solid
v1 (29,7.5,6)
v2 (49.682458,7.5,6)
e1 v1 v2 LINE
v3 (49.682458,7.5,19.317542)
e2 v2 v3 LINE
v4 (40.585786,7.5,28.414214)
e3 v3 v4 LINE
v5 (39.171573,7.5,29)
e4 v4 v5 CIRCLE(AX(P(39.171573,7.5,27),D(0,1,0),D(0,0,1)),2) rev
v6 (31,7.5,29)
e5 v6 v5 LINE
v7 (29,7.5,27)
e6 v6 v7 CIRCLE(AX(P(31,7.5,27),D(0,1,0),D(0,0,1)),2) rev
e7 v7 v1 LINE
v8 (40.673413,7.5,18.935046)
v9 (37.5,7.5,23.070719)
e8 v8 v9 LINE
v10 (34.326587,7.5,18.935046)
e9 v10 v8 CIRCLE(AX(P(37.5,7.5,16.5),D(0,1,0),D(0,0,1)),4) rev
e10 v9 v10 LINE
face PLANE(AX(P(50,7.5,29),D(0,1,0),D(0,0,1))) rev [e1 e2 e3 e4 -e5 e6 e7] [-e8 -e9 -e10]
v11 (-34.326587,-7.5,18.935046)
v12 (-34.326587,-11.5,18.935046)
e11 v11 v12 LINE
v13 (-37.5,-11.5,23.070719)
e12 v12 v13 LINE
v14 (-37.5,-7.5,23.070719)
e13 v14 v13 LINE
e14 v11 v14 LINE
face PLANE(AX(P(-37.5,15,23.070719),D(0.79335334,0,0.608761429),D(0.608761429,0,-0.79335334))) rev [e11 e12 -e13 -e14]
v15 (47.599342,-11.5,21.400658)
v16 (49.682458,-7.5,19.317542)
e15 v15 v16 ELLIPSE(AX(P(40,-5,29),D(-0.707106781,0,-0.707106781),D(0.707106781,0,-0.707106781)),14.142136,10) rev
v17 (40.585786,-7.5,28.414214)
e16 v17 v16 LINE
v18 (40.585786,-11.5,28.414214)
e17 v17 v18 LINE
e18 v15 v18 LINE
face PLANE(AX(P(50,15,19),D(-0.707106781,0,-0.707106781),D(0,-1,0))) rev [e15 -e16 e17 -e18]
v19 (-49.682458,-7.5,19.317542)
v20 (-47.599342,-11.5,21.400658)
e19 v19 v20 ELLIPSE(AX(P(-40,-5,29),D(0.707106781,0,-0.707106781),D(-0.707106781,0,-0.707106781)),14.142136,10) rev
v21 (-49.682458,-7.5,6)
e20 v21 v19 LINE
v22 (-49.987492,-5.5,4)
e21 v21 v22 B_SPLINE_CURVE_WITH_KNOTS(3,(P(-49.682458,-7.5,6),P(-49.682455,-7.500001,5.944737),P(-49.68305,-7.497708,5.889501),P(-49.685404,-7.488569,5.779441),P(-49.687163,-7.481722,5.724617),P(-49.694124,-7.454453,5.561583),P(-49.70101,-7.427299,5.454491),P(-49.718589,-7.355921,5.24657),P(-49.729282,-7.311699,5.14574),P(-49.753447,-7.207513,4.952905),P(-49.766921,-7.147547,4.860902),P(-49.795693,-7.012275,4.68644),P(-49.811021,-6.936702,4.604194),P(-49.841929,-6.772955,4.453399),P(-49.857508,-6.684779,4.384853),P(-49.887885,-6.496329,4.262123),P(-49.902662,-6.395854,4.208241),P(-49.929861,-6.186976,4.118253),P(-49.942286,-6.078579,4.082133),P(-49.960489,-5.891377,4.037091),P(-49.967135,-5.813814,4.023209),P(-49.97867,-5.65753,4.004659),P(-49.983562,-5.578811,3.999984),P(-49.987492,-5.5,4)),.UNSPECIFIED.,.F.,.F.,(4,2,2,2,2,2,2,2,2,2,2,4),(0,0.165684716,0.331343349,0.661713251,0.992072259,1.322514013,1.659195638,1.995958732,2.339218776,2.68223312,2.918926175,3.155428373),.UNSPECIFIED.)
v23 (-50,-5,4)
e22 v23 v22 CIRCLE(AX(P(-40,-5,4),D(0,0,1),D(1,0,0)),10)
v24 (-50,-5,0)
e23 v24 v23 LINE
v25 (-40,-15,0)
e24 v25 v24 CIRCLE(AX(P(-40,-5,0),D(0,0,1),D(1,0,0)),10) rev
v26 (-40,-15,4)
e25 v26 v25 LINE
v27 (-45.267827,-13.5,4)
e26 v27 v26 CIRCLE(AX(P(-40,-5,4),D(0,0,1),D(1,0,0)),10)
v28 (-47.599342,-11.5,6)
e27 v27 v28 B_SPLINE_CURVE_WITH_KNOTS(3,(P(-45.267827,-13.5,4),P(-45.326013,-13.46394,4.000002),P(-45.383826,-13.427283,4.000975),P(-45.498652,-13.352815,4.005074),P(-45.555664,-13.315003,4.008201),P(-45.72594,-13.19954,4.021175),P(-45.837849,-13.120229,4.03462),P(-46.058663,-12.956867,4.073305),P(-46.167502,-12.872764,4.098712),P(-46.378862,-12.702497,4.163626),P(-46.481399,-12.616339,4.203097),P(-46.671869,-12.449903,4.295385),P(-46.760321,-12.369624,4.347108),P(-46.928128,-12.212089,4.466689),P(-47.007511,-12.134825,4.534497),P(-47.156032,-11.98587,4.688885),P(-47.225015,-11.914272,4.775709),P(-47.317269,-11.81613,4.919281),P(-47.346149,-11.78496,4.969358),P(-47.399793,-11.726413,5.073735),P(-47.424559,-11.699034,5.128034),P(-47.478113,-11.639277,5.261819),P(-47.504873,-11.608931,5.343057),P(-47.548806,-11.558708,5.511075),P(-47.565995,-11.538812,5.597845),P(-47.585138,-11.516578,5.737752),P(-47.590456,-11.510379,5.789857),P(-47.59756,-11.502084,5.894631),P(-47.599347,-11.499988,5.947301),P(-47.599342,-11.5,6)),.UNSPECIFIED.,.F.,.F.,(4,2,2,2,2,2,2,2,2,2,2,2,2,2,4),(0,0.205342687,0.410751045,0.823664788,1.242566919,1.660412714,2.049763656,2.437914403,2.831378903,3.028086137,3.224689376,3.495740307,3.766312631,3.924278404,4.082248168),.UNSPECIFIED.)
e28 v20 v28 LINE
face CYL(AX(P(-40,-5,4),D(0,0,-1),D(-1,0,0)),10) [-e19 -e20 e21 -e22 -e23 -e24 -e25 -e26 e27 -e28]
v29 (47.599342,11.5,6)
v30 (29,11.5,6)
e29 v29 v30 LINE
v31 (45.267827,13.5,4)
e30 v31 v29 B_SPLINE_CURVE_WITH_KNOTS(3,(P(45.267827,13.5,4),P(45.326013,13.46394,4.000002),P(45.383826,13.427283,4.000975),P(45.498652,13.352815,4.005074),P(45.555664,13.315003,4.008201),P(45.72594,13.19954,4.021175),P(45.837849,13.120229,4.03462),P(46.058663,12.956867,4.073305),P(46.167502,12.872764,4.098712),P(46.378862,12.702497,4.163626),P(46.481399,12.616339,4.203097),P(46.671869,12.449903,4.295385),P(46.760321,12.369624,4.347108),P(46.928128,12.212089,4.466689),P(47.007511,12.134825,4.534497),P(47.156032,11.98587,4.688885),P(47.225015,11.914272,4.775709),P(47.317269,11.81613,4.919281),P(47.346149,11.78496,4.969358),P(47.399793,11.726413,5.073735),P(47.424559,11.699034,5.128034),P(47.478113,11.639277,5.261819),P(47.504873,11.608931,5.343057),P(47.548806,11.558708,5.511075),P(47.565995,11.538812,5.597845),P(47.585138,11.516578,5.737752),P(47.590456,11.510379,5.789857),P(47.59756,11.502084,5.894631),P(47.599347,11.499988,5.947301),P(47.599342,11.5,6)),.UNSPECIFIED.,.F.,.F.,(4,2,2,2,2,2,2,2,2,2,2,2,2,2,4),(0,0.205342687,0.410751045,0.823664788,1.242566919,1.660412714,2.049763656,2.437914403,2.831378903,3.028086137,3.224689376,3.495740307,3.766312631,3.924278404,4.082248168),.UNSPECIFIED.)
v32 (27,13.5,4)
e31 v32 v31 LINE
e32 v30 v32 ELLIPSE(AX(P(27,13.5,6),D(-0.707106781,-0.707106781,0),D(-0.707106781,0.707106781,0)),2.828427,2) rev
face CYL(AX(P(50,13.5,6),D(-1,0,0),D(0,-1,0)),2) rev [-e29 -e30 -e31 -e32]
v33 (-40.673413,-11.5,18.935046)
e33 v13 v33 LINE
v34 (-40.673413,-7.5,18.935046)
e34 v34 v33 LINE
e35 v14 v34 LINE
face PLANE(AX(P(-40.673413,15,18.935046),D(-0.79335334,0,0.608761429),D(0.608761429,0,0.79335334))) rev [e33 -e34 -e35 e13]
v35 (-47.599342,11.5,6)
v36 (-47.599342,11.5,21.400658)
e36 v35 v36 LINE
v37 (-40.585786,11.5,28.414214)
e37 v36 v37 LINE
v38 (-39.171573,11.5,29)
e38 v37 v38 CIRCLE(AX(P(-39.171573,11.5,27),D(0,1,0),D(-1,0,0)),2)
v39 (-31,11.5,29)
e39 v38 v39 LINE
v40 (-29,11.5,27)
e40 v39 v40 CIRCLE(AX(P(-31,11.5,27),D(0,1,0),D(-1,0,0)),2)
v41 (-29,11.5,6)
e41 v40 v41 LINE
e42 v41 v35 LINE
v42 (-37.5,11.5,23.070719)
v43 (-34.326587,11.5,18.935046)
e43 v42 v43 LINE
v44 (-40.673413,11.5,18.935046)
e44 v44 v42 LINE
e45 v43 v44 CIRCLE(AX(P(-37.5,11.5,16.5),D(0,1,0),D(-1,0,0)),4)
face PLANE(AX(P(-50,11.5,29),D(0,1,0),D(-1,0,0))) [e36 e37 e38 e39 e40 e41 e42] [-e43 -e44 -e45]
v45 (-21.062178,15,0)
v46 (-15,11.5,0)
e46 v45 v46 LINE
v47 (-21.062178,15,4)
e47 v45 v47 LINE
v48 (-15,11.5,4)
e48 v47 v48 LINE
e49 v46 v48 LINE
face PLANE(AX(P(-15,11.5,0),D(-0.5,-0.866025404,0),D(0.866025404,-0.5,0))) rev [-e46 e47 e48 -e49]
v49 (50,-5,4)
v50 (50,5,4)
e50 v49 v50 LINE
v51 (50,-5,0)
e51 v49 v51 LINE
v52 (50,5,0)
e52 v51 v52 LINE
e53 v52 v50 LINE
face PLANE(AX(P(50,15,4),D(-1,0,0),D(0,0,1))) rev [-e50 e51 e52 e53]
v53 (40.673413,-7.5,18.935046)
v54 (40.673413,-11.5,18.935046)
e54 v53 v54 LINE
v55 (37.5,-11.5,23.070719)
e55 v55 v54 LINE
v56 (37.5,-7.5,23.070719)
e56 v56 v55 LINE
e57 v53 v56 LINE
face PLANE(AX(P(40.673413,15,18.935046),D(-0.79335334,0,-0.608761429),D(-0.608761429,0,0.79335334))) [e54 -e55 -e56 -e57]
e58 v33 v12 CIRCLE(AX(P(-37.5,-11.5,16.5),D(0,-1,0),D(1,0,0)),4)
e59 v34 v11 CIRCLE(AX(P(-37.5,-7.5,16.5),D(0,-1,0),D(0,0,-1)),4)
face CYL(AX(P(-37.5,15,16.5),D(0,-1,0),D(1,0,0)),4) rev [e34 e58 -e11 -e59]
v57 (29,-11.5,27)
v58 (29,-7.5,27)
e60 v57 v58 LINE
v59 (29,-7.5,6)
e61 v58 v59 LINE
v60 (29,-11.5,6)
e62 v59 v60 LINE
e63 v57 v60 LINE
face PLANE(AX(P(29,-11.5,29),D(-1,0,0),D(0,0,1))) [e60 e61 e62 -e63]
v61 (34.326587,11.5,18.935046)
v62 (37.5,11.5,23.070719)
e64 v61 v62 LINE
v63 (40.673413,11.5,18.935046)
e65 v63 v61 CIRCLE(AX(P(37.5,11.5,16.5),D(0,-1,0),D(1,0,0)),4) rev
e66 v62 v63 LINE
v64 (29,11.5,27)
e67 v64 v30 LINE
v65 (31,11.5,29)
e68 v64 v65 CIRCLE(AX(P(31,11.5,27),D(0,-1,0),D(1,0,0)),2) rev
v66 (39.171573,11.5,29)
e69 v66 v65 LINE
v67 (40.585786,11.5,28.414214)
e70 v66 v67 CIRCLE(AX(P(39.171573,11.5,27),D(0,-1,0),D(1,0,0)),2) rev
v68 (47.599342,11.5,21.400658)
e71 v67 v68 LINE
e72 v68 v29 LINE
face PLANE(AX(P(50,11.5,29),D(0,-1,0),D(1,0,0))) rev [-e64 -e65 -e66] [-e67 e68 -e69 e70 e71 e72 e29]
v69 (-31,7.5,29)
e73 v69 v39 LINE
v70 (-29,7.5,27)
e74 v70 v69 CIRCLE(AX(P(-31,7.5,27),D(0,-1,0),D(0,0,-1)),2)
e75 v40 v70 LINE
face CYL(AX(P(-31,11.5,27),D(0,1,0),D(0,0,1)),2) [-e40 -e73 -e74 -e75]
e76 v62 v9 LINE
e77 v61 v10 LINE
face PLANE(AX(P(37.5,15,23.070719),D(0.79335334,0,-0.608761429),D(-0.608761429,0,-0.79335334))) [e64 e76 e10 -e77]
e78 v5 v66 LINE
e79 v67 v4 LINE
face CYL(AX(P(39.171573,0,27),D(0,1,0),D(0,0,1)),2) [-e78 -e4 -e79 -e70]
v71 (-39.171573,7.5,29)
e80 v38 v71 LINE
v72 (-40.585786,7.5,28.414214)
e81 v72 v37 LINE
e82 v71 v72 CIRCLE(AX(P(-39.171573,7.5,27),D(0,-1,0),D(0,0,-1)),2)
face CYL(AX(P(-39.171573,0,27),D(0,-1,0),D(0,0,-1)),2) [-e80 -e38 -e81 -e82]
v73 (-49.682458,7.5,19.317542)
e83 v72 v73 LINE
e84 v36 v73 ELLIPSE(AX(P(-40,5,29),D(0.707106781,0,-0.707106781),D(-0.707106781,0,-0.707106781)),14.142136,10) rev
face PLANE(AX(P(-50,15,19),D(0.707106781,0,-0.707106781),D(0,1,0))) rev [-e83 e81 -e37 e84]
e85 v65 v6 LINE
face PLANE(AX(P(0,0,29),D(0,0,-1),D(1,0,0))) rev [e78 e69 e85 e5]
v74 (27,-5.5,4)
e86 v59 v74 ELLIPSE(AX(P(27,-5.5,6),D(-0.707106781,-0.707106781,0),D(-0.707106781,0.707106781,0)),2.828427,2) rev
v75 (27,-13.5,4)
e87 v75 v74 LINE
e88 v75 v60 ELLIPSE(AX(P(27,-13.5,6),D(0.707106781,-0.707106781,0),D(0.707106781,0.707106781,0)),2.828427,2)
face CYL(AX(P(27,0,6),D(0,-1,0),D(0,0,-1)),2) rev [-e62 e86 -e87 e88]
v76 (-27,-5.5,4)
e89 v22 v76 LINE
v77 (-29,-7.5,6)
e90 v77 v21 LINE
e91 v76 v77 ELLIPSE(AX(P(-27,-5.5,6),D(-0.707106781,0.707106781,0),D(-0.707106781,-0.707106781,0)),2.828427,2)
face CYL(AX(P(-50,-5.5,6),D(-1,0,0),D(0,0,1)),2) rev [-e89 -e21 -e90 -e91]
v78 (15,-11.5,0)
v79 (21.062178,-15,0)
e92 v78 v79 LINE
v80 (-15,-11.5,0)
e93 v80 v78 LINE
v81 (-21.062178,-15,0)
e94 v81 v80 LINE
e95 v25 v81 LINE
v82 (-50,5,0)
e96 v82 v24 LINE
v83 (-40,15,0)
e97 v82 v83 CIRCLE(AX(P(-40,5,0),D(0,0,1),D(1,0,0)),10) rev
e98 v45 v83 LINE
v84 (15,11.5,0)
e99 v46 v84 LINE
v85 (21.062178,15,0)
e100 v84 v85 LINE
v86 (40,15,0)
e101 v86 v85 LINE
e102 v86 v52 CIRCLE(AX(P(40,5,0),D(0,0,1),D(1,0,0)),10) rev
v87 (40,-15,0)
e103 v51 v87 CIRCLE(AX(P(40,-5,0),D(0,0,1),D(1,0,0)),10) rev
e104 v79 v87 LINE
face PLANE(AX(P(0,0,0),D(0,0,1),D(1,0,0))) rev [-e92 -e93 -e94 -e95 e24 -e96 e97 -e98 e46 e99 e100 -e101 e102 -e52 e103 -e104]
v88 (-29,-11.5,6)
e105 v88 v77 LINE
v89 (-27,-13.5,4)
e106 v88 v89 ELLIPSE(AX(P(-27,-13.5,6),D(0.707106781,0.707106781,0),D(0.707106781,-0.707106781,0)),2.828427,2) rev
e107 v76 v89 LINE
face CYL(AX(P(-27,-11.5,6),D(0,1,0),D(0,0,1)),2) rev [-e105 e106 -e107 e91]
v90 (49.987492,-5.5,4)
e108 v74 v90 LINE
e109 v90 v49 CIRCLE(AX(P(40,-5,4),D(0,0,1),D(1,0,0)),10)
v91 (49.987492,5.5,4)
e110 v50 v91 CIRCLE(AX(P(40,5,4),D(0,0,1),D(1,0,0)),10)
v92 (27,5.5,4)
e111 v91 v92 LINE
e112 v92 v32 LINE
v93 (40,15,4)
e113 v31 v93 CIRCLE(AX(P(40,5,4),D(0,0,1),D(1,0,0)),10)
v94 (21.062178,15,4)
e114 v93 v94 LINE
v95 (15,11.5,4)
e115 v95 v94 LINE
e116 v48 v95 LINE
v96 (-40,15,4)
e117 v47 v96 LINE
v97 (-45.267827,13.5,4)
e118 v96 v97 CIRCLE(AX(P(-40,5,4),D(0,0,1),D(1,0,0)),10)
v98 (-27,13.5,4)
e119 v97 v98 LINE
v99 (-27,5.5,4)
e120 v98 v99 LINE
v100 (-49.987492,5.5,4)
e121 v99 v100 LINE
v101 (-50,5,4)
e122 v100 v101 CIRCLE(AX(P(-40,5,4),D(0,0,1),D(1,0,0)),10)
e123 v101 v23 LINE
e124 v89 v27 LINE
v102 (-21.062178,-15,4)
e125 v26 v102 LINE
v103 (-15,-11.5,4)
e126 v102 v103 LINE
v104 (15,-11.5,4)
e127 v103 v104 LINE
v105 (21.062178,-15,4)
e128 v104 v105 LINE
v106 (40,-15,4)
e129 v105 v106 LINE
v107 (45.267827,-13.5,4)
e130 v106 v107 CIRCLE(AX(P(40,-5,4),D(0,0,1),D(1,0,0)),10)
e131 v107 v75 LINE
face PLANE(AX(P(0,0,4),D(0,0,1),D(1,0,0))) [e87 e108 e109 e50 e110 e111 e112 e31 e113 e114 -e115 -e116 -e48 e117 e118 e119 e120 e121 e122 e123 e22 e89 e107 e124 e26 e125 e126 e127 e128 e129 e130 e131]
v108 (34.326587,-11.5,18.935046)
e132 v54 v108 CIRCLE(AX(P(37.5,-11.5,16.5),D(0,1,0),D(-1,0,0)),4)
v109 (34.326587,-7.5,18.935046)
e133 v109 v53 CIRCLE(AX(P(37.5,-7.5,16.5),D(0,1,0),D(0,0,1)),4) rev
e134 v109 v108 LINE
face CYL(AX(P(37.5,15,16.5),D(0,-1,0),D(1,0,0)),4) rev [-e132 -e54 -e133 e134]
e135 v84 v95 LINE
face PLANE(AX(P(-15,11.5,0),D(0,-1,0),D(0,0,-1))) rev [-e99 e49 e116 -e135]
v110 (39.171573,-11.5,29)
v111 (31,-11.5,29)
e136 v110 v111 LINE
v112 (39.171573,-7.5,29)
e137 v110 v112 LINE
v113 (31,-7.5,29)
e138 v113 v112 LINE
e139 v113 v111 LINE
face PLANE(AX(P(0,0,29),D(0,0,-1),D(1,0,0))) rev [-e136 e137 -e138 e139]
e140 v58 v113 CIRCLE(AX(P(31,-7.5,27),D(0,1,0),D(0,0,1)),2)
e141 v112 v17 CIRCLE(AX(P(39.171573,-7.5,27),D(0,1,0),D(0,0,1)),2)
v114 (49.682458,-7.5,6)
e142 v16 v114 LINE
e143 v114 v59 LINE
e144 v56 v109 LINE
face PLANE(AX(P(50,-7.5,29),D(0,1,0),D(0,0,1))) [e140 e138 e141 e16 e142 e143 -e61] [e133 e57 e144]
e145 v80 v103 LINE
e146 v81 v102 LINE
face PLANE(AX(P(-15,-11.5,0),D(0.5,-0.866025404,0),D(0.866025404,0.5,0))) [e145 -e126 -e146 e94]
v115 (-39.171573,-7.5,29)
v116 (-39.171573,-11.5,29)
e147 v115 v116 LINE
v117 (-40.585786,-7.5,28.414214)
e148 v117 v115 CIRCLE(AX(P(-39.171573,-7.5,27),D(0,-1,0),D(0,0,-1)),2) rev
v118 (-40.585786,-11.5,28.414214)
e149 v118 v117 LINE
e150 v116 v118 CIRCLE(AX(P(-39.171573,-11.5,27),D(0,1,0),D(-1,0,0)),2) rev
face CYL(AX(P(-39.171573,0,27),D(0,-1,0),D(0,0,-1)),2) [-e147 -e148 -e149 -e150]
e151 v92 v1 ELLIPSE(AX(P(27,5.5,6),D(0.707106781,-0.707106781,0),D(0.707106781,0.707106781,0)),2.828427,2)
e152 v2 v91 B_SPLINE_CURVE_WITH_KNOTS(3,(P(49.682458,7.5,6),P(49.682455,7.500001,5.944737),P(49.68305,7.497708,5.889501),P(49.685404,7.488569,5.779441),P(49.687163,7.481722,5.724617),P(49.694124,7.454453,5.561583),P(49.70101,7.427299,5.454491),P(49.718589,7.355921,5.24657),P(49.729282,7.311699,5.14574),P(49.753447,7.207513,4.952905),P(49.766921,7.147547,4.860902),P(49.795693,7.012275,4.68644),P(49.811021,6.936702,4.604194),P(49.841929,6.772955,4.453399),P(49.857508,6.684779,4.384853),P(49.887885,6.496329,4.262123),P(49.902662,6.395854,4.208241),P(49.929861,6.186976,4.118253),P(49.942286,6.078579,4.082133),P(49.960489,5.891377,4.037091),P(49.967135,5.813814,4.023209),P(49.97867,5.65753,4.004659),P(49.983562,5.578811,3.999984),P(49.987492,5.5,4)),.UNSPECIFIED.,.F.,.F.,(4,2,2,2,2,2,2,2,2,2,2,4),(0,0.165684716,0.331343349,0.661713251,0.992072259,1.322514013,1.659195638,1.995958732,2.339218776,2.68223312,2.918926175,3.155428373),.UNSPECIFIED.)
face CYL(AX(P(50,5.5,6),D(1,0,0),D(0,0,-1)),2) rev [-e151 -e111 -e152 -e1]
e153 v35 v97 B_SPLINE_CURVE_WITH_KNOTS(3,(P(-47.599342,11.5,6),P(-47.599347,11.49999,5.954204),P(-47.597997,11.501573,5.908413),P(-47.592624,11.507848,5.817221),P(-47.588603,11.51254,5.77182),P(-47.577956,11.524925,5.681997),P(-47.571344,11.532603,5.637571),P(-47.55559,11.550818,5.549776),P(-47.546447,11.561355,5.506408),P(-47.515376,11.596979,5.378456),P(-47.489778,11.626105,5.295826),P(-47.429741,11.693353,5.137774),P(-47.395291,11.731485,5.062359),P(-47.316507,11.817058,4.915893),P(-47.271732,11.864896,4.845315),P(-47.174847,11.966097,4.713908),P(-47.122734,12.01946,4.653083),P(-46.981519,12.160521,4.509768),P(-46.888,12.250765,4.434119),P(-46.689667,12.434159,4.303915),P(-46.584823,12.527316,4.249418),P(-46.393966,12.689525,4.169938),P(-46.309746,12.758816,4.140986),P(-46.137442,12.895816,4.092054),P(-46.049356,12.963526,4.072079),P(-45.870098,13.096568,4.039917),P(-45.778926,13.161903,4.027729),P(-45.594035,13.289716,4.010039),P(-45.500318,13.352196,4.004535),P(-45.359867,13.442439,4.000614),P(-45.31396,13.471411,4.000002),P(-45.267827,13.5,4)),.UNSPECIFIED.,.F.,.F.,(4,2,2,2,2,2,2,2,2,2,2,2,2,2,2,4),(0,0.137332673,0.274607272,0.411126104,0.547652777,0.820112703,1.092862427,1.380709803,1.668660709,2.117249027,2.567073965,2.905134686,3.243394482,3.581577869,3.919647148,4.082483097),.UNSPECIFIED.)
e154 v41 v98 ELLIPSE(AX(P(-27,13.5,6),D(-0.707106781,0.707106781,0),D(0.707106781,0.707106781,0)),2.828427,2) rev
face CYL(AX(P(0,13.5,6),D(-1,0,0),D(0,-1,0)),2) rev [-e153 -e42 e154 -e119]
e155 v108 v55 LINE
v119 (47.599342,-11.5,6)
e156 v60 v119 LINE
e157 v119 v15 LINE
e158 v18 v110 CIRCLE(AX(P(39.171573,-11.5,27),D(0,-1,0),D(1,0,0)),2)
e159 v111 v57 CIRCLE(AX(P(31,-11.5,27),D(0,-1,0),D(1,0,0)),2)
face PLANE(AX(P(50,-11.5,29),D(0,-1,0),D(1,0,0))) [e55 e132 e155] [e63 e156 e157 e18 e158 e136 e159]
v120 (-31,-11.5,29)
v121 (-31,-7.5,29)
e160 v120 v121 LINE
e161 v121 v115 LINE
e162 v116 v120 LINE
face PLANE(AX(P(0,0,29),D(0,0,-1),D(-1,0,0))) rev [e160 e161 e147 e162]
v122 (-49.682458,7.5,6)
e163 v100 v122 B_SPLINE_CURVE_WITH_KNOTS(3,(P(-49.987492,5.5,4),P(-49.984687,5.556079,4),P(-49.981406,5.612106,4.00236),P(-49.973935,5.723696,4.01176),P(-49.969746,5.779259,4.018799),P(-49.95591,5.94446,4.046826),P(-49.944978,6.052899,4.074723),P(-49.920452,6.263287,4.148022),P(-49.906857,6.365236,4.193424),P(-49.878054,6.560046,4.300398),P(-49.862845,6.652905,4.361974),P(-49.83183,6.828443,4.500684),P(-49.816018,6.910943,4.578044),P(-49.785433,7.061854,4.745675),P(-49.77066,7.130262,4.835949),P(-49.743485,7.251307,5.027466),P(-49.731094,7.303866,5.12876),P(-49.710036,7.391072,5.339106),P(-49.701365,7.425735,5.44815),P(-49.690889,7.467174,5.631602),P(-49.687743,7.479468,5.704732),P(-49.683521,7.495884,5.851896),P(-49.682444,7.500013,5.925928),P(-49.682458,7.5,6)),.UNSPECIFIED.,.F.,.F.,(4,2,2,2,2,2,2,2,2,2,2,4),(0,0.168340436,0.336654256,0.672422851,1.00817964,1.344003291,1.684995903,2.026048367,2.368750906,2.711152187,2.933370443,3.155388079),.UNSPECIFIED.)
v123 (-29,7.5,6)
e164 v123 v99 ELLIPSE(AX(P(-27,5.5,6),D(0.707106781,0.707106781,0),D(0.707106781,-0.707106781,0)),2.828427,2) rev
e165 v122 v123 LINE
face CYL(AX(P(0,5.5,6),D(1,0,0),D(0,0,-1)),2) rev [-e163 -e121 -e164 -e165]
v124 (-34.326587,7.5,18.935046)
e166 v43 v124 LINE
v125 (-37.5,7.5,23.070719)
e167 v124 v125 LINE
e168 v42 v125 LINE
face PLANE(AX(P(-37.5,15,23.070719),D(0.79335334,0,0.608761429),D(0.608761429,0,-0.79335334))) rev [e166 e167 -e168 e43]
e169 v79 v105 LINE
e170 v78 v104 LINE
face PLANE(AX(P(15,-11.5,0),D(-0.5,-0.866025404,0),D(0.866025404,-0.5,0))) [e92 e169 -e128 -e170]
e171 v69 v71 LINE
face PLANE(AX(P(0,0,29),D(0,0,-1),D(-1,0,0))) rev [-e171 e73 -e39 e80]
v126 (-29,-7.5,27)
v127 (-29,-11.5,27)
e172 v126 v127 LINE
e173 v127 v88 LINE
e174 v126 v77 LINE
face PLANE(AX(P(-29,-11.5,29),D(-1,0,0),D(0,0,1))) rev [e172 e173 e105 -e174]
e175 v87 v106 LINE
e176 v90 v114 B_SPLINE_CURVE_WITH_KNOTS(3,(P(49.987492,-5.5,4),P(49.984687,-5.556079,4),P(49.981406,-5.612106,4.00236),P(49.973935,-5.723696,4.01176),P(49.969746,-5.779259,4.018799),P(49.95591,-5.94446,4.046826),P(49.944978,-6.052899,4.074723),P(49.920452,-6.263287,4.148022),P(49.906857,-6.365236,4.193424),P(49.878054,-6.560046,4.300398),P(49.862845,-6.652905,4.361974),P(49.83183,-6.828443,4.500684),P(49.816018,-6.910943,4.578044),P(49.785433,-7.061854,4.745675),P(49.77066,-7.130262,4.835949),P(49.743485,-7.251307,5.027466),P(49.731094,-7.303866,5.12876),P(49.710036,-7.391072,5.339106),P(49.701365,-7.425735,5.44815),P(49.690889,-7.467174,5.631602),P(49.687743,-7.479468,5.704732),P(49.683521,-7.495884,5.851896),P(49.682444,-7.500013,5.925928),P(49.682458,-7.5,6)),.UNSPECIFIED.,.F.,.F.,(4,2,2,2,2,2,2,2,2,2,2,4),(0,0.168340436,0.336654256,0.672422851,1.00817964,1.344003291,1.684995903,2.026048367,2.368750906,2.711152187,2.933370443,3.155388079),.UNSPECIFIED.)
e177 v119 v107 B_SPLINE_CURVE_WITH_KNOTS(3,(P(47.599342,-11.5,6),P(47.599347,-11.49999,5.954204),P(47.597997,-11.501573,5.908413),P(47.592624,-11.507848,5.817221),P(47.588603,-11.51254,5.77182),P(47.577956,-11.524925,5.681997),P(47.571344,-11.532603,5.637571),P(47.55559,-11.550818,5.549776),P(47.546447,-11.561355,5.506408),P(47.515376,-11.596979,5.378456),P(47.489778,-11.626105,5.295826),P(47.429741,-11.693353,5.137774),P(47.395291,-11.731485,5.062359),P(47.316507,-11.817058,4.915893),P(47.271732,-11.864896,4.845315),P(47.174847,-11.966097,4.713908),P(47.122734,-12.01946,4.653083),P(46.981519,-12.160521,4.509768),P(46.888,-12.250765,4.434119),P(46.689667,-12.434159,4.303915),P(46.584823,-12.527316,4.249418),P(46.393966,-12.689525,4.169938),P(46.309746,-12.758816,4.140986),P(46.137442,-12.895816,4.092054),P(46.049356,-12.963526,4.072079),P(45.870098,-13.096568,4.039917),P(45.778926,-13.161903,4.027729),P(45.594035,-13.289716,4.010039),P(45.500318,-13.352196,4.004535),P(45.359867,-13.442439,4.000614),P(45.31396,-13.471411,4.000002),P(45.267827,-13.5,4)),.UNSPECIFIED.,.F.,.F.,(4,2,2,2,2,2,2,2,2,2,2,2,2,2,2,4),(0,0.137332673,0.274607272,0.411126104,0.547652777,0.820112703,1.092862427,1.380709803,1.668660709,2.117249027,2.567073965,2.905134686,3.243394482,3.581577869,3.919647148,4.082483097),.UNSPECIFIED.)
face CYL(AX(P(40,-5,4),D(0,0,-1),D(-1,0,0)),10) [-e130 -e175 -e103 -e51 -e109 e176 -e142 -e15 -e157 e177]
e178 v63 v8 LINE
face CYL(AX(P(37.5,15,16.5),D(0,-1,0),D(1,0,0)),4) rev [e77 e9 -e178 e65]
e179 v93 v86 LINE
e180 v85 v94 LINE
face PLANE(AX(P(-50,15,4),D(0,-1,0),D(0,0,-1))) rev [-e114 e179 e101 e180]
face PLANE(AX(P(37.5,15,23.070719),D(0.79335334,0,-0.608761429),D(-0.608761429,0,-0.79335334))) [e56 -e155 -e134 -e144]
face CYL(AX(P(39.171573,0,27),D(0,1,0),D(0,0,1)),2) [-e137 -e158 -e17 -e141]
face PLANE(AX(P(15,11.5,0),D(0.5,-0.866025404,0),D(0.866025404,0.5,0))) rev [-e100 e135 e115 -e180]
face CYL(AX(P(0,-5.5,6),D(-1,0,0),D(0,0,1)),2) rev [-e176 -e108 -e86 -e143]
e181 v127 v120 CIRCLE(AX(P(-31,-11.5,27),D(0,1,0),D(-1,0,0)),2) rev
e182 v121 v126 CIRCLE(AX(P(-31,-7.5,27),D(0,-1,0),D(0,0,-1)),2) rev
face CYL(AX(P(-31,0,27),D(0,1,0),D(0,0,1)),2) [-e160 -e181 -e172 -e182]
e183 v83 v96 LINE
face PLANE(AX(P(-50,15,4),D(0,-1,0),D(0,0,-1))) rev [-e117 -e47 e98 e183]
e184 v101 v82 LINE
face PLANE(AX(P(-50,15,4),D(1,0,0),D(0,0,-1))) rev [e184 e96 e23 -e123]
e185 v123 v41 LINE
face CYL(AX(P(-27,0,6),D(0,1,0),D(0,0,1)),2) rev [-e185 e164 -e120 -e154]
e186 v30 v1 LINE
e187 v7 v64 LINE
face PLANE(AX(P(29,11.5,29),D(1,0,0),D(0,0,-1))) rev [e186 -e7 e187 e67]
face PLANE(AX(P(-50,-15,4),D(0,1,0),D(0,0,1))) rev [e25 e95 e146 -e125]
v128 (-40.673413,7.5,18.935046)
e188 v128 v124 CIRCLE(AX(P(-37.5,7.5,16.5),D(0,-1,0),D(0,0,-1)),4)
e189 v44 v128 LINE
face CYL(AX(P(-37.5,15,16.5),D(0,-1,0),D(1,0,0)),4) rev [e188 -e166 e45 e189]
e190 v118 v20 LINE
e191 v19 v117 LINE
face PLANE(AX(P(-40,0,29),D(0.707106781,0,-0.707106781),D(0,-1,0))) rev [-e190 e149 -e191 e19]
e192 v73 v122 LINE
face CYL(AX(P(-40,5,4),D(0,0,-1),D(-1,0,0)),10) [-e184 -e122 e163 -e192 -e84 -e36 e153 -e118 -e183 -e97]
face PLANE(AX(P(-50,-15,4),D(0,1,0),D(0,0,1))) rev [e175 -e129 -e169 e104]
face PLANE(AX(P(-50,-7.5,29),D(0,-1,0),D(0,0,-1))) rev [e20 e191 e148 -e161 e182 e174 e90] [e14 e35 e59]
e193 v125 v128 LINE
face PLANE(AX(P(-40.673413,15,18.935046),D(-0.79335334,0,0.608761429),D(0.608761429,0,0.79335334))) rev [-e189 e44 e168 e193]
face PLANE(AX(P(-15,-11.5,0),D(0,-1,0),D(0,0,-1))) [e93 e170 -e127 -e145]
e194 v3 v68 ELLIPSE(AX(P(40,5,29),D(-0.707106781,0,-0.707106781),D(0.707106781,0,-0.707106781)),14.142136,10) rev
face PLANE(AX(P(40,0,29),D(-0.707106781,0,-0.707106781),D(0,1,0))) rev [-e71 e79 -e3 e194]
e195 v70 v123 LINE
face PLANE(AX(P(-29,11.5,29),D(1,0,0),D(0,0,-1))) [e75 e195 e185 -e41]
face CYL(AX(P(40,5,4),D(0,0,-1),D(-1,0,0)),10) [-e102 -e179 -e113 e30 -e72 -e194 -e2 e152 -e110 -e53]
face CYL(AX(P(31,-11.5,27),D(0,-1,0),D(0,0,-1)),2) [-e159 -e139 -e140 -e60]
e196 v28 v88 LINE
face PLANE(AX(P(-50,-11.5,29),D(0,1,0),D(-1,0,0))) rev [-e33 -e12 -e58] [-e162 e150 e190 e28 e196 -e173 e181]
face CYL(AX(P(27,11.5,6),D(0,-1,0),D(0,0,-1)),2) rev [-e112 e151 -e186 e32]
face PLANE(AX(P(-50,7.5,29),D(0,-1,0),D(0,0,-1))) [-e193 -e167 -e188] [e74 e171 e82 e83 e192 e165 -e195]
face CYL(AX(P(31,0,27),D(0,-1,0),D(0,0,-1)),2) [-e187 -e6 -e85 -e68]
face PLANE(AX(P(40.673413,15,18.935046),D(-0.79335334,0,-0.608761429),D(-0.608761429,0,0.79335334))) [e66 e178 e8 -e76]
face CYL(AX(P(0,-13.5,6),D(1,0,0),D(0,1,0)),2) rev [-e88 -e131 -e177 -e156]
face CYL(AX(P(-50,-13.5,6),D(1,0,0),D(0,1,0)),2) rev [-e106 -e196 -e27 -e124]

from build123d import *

# Parameters (mm, degrees)
SKETCH1_W                = 100
SKETCH1_H                = 30
BOSS_EXTRUDE1_DEPTH      = 4
SKETCH2_W                = 21
SKETCH2_H                = 4
BOSS_EXTRUDE2_DEPTH      = 25
CHAMFER1_SIZE            = 10
CHAMFER1_OF_MIRROR1_SIZE = 10
MIRROR2_START            = -11.5
MIRROR2_DEPTH            = 4
MIRROR2_START_2          = 7.5
MIRROR2_2_DEPTH          = 4
CUT_EXTRUDE1_DEPTH       = 64.586555183
FILLET1_R                = 10
FILLET2_R                = 2
CUT_EXTRUDE2_DEPTH       = 58.879184626


# Read off the part's stored shape, not the designer's step: Mirror2
with BuildPart() as part:
    # Sketch1 → Boss-Extrude1 (new body)
    with BuildSketch(Plane.XY):
        Rectangle(SKETCH1_W, SKETCH1_H)
    extrude(amount=BOSS_EXTRUDE1_DEPTH)

    # Sketch2 → Boss-Extrude2 (add)
    with BuildSketch(Plane.XY.offset(4)):
        with Locations((-39.5, -9.5)):
            Rectangle(SKETCH2_W, SKETCH2_H)
    boss_extrude2 = extrude(amount=BOSS_EXTRUDE2_DEPTH)

    # Chamfer1
    chamfer1_edges = [part.edges().sort_by_distance(p)[0] for p in [
        (-50, -9.5, 29),
    ]]
    chamfer(chamfer1_edges, length=CHAMFER1_SIZE)

    # Mirror1: Boss-Extrude2 across plane
    add(boss_extrude2.mirror(Plane.ZX))

    # Chamfer1 of Mirror1
    chamfer1_of_mirror1_edges = [part.edges().sort_by_distance(p)[0] for p in [
        (-50, 9.5, 29),
    ]]
    chamfer(chamfer1_of_mirror1_edges, length=CHAMFER1_OF_MIRROR1_SIZE)

    # Mirror2 outline → Mirror2 (add)
    with BuildSketch(Plane(origin=(0, 0, 0), x_dir=(1, 0, 0), z_dir=(0, 1, 0)).offset(MIRROR2_START)):
        Polygon((50, -19), (50, -4), (29, -4), (29, -29), (40, -29), align=None)
    extrude(amount=MIRROR2_DEPTH)

    # Mirror2 2 outline → Mirror2 2 (add)
    with BuildSketch(Plane(origin=(0, 0, 0), x_dir=(1, 0, 0), z_dir=(0, 1, 0)).offset(MIRROR2_START_2)):
        Polygon((50, -19), (50, -4), (29, -4), (29, -29), (40, -29), align=None)
    extrude(amount=MIRROR2_2_DEPTH)

    # Sketch3 → Cut-Extrude1 (cut, through all)
    with BuildSketch(Plane.XZ.offset(11.5)):
        with BuildLine():
            Line((-40.673413361, 18.935045716), (-37.5, 23.070718527))
            Line((-37.5, 23.070718527), (-34.326586639, 18.935045716))
            ThreePointArc((-34.326586639, 18.935045716), (-37.5, 12.5), (-40.673413361, 18.935045716))
        make_face()
    cut_extrude1 = extrude(amount=-CUT_EXTRUDE1_DEPTH, mode=Mode.SUBTRACT)

    # Mirror4: Cut-Extrude1 across plane
    add(cut_extrude1.mirror(Plane(origin=(0, 0, 0), x_dir=(0, 0, 1), z_dir=(1, 0, 0))), mode=Mode.SUBTRACT)

    # Fillet1
    # the kernel refuses this fillet: 10 mm, written as the material it takes off along each edge
    with BuildSketch(Plane(origin=(50, 15, -25), x_dir=(-1, 0, 0), z_dir=(0, 0, 1)), Plane(origin=(-50, 15, -25), x_dir=(0, -1, 0), z_dir=(0, 0, 1))) as fillet1_piece_1:
        with BuildLine():
            CenterArc((FILLET1_R, FILLET1_R), FILLET1_R, 180, 90)
            Line((0, FILLET1_R), (0, 0))
            Line((0, 0), (FILLET1_R, 0))
        make_face()
    extrude(amount=54, mode=Mode.SUBTRACT)
    with BuildSketch(Plane(origin=(50, -15, -25), x_dir=(-1, 0, 0), z_dir=(0, 0, 1)), Plane(origin=(-50, -15, -25), x_dir=(0, 1, 0), z_dir=(0, 0, 1))) as fillet1_piece_2:
        with BuildLine():
            CenterArc((FILLET1_R, -FILLET1_R), FILLET1_R, 90, 90)
            Line((0, -FILLET1_R), (0, 0))
            Line((0, 0), (FILLET1_R, 0))
        make_face()
    extrude(amount=54, mode=Mode.SUBTRACT)

    # Fillet2
    fillet2_edges = [part.edges().sort_by_distance(p)[0] for p in [
        (38.299671038, 11.5, 4),
        (-38.299671038, 11.5, 4),
        (-38.299671038, -11.5, 4),
        (38.299671038, -11.5, 4),
        (-29, -9.5, 4),
        (-39.341229183, -7.5, 4),
        (-29, -9.5, 29),
        (-40, -9.5, 29),
        (-29, 9.5, 29),
        (-29, 9.5, 4),
        (-39.341229183, 7.5, 4),
        (-40, 9.5, 29),
        (29, 9.5, 4),
        (39.341229183, 7.5, 4),
        (29, 9.5, 29),
        (40, 9.5, 29),
        (29, -9.5, 29),
        (29, -9.5, 4),
        (39.341229183, -7.5, 4),
        (40, -9.5, 29),
    ]]
    fillet(fillet2_edges, radius=FILLET2_R)

    # Sketch4 → Cut-Extrude2 (cut, through all)
    with BuildSketch(Plane.XY.offset(4)):
        Polygon((-15, 15), (15, 15), (21.062177826, 15), (15, 11.5), (-15, 11.5), (-21.062177826, 15), align=None)
    cut_extrude2 = extrude(amount=-CUT_EXTRUDE2_DEPTH, mode=Mode.SUBTRACT)

    # Mirror5: Cut-Extrude2 across plane
    add(cut_extrude2.mirror(Plane.ZX), mode=Mode.SUBTRACT)


solid = part.part
